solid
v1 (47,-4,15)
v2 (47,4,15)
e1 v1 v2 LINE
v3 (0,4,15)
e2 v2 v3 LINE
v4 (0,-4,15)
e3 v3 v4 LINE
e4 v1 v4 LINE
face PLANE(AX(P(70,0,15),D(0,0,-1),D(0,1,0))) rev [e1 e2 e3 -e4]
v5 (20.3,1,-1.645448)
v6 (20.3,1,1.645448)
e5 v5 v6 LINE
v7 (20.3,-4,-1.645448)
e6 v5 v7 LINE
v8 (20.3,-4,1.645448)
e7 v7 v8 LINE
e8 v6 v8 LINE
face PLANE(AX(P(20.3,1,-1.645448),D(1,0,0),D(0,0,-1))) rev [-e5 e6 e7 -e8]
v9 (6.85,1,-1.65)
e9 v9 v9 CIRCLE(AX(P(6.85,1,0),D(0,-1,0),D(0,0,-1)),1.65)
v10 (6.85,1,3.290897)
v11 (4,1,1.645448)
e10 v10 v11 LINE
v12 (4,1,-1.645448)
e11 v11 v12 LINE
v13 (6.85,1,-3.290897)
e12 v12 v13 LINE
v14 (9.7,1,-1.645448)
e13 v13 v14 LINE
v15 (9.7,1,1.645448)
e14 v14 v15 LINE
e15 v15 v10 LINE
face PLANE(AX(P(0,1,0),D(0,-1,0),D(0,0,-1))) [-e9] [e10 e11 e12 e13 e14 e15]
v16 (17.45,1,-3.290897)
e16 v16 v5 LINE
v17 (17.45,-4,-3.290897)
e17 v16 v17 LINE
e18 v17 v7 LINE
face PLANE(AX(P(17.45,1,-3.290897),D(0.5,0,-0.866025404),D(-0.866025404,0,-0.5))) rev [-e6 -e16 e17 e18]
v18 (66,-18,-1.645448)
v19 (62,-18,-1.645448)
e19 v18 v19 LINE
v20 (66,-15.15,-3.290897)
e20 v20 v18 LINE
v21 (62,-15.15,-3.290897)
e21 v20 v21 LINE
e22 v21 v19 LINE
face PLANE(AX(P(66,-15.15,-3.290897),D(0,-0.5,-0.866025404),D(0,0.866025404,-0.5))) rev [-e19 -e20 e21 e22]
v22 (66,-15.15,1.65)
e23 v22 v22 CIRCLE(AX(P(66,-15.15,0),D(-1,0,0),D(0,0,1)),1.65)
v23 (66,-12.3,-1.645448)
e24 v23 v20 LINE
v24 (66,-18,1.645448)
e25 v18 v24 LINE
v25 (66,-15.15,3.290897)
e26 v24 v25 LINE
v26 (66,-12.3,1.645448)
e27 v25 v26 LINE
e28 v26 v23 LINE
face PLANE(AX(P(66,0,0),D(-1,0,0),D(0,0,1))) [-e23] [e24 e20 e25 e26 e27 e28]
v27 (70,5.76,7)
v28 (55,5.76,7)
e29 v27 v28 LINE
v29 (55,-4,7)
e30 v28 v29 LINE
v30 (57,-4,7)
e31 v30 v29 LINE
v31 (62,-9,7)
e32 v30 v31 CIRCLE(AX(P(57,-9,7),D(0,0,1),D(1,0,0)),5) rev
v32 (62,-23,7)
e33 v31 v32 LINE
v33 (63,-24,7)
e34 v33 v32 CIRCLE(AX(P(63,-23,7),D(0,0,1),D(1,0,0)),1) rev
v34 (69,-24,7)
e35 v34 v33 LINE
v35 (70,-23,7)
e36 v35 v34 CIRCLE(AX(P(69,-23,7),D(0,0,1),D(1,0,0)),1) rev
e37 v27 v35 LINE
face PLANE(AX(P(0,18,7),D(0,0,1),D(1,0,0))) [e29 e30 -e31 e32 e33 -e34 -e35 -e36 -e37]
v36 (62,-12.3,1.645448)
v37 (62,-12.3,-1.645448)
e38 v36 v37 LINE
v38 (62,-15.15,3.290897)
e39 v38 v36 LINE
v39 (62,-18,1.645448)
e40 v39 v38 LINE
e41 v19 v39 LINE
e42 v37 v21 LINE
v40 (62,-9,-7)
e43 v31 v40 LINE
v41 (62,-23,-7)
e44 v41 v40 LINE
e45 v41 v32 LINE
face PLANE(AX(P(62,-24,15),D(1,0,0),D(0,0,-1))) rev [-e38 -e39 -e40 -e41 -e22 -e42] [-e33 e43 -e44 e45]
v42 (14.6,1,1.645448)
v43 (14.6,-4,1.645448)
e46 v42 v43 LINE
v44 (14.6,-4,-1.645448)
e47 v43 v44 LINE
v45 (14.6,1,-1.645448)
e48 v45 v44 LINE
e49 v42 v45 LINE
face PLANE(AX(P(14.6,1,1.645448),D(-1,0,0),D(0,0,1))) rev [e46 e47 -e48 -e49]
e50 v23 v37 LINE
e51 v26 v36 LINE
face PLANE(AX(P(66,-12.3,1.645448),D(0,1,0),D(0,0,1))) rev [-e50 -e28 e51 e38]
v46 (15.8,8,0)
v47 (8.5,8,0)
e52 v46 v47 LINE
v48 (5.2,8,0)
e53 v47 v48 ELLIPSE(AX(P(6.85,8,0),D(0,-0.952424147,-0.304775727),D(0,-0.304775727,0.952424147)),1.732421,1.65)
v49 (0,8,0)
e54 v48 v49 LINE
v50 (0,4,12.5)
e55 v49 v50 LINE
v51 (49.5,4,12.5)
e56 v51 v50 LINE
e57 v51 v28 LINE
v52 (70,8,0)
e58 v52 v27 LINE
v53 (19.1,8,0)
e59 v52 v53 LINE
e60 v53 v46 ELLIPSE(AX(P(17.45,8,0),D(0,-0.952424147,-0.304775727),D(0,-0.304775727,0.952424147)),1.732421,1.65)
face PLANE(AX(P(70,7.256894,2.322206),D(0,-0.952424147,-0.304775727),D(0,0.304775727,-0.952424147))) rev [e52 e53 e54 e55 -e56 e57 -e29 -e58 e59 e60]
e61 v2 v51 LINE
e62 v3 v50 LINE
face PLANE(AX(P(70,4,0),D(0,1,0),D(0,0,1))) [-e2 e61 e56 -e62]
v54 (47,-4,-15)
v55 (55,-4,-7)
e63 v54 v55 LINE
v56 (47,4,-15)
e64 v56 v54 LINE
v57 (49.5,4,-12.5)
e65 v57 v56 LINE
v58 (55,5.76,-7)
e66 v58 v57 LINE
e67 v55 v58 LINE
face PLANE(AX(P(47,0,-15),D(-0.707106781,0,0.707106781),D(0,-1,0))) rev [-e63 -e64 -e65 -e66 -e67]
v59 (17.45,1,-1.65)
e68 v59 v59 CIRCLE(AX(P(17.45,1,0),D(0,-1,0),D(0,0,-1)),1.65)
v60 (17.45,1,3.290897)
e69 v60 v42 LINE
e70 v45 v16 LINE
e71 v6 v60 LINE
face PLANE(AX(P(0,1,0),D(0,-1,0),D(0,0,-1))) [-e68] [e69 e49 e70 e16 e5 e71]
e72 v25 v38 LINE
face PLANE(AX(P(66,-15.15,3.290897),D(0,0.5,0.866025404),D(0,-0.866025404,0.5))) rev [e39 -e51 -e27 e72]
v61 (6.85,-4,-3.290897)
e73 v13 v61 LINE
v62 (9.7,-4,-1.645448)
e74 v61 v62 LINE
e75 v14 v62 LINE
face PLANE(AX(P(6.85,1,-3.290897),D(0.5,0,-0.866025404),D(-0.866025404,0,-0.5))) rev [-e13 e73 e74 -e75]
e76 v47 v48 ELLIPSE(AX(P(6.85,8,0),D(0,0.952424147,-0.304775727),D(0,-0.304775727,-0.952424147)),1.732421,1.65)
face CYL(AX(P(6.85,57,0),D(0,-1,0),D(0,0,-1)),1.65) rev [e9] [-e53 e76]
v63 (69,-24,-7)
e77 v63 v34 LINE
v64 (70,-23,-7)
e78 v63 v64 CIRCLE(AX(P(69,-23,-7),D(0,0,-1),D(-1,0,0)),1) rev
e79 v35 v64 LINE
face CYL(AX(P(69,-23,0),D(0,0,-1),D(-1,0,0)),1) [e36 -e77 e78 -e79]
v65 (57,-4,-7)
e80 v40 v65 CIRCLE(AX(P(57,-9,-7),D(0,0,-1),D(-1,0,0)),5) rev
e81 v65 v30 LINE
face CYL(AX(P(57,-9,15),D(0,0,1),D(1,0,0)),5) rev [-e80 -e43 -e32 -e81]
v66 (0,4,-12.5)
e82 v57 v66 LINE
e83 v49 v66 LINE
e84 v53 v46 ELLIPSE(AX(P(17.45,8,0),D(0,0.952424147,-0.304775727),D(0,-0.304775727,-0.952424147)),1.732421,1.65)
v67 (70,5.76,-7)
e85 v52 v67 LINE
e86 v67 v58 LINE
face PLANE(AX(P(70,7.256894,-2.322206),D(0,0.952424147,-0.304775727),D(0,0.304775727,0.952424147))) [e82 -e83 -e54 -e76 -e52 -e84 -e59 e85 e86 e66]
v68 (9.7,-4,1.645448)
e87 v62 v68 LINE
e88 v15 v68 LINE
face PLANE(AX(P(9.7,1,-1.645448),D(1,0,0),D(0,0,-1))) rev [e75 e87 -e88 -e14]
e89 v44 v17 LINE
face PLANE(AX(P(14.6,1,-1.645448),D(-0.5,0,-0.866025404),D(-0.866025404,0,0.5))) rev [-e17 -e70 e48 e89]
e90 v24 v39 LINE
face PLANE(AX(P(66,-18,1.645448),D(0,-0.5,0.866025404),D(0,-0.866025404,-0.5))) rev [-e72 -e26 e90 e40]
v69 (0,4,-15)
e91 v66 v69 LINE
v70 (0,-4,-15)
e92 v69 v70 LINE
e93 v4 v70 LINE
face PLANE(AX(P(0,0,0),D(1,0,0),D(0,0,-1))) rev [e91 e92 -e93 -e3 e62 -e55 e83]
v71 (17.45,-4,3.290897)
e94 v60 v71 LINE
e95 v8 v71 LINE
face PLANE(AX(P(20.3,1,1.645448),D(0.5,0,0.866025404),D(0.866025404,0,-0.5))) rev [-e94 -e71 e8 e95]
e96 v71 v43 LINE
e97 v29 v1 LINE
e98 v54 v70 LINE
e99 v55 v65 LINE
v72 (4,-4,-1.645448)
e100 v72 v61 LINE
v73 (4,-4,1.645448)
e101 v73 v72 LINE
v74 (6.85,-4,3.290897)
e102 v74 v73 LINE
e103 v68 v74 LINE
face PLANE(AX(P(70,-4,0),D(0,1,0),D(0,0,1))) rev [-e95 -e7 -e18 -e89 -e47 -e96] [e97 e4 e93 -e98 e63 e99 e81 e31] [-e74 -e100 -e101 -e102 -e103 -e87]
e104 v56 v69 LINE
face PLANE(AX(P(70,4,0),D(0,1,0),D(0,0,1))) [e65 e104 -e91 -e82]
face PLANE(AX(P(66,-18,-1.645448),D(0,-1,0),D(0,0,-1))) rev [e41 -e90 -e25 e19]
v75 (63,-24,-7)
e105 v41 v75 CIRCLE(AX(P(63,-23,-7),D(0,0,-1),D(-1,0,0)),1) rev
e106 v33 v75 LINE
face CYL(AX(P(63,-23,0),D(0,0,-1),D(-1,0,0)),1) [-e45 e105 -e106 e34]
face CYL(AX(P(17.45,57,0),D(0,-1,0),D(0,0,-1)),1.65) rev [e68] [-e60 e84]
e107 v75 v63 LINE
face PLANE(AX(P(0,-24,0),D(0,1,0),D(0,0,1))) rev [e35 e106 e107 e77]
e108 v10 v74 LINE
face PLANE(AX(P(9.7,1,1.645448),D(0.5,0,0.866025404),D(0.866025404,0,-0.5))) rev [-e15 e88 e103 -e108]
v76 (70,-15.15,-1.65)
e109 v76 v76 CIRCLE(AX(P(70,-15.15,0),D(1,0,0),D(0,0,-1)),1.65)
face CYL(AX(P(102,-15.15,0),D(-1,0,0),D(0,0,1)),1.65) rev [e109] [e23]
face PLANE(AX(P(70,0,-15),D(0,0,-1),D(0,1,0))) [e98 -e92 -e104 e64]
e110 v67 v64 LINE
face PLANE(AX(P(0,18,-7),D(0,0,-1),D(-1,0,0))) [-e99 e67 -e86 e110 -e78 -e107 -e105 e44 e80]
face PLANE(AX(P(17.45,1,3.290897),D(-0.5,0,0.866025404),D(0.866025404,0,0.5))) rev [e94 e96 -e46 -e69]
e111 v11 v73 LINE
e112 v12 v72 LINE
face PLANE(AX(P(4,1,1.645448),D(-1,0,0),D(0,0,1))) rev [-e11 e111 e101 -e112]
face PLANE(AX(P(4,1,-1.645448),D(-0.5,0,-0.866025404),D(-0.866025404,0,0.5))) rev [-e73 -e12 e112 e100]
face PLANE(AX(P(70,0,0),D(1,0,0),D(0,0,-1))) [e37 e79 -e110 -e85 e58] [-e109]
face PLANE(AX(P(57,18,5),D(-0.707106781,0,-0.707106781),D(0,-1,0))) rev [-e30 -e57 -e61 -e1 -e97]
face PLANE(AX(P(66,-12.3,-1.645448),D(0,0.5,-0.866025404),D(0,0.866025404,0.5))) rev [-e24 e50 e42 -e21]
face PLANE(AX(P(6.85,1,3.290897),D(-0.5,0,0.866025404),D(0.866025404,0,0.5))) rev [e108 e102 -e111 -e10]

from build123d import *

# Parameters (mm, degrees)
BOSS_EXTRUDE1_DEPTH = 70
SKETCH2_R           = 1.65
CUT_EXTRUDE1_DEPTH  = 5
SKETCH3_R           = 1.65
CUT_EXTRUDE2_DEPTH  = 61
SKETCH4_W           = 8
SKETCH4_H           = 30
BOSS_EXTRUDE2_DEPTH = 20
SKETCH5_R           = 1.65
CUT_EXTRUDE3_DEPTH  = 4
SKETCH6_R           = 1.65
CUT_EXTRUDE4_DEPTH  = 40
FILLET1_R           = 1
FILLET2_R           = 5
SKETCH7_W           = 6
SKETCH7_H           = 8
SKETCH7_W_2         = 1
CUT_EXTRUDE5_DEPTH  = 42
CHAMFER1_SIZE       = 10


with BuildPart() as part:
    # Sketch1 → Boss-Extrude1 (new body)
    with BuildSketch(Plane(origin=(0, 0, 0), x_dir=(0, 0, -1), z_dir=(1, 0, 0))):
        Polygon((0, 8), (12.5, 4), (-12.5, 4), align=None)
        Polygon((12.5, 4), (-12.5, 4), (-15, 4), (-15, -4), (15, -4), (15, 4), align=None)
    extrude(amount=BOSS_EXTRUDE1_DEPTH)

    # Sketch2 → Cut-Extrude1 (cut)
    # profile 1 of 2: a face of its own
    with BuildSketch(Plane.XZ.offset(4)):
        Polygon((6.85, 3.290896534), (4, 1.645448267), (4, -1.645448267), (6.85, -3.290896534), (9.7, -1.645448267), (9.7, 1.645448267), align=None)
        with Locations(Location((6.85, 0, 0), (0, 0, 270))):
            Circle(SKETCH2_R, mode=Mode.SUBTRACT)
    # profile 2 of 2: a face of its own
    with BuildSketch(Plane.XZ.offset(4)):
        Polygon((17.45, -3.290896534), (20.3, -1.645448267), (20.3, 1.645448267), (17.45, 3.290896534), (14.6, 1.645448267), (14.6, -1.645448267), align=None)
        with Locations(Location((17.45, 0, 0), (0, 0, 270))):
            Circle(SKETCH2_R, mode=Mode.SUBTRACT)
    extrude(amount=-CUT_EXTRUDE1_DEPTH, mode=Mode.SUBTRACT)

    # Sketch3 → Cut-Extrude2 (cut)
    with BuildSketch(Plane.XZ.offset(4)):
        with Locations(Location((6.85, 0, 0), (0, 0, 270))):
            Circle(SKETCH3_R)
        with Locations(Location((17.45, 0, 0), (0, 0, 270))):
            Circle(SKETCH3_R)
    extrude(amount=-CUT_EXTRUDE2_DEPTH, mode=Mode.SUBTRACT)

    # Sketch4 → Boss-Extrude2 (add)
    with BuildSketch(Plane.XZ.offset(4)):
        with Locations((66, 0)):
            Rectangle(SKETCH4_W, SKETCH4_H)
    extrude(amount=BOSS_EXTRUDE2_DEPTH)

    # Sketch5 → Cut-Extrude3 (cut)
    with BuildSketch(Plane.ZY.offset(-62)):
        Polygon((3.290896534, -15.15), (1.645448267, -12.3), (-1.645448267, -12.3), (-3.290896534, -15.15), (-1.645448267, -18), (1.645448267, -18), align=None)
        with Locations((0, -15.15)):
            Circle(SKETCH5_R, mode=Mode.SUBTRACT)
    extrude(amount=-CUT_EXTRUDE3_DEPTH, mode=Mode.SUBTRACT)

    # Sketch6 → Cut-Extrude4 (cut)
    with BuildSketch(Plane.ZY.offset(-62)):
        with Locations((0, -15.15)):
            Circle(SKETCH6_R)
    extrude(amount=-CUT_EXTRUDE4_DEPTH, mode=Mode.SUBTRACT)

    # Fillet1
    fillet1_edges = [part.edges().sort_by_distance(p)[0] for p in [
        (70, -24, 0),
        (62, -24, 0),
    ]]
    fillet(fillet1_edges, radius=FILLET1_R)

    # Fillet2
    fillet2_edges = [part.edges().sort_by_distance(p)[0] for p in [
        (62, -4, 0),
    ]]
    fillet(fillet2_edges, radius=FILLET2_R)

    # Sketch7 → Cut-Extrude5 (cut)
    with BuildSketch(Plane.XZ.offset(24)):
        with Locations((66, 11)):
            Rectangle(SKETCH7_W, SKETCH7_H)
        with Locations((69.5, 11)):
            Rectangle(SKETCH7_W_2, SKETCH7_H)
        with Locations((60, 11)):
            Rectangle(SKETCH7_W, SKETCH7_H)
        with Locations((60, -11)):
            Rectangle(SKETCH7_W, SKETCH7_H)
        with Locations((66, -11)):
            Rectangle(SKETCH7_W, SKETCH7_H)
        with Locations((69.5, -11)):
            Rectangle(SKETCH7_W_2, SKETCH7_H)
    extrude(amount=-CUT_EXTRUDE5_DEPTH, mode=Mode.SUBTRACT)

    # Chamfer1
    # the kernel refuses this chamfer: 10 mm, written as the material it takes off along each edge
    with BuildSketch(Plane(origin=(57, -29.71682988, 15), x_dir=(0.027495876610587014, 0, -0.9996219169112968), z_dir=(0, 1, 0))) as chamfer1_piece_1_section:
        Polygon((CHAMFER1_SIZE * 0.999621916911, CHAMFER1_SIZE * 0.0274958766106), (-CHAMFER1_SIZE * 0.0274958766106, CHAMFER1_SIZE * 0.999621916911), (0, 0), align=None)
    chamfer1_piece_1 = extrude(amount=59.433659759, mode=Mode.PRIVATE)
    chamfer1_piece_1 = split(chamfer1_piece_1, bisect_by=Plane(origin=(53.542815877, 0, 7), z_dir=(0, 0, 1)), keep=Keep.TOP, mode=Mode.PRIVATE)
    add(chamfer1_piece_1, mode=Mode.SUBTRACT)
    with BuildSketch(Plane(origin=(57, -29.71682988, -15), x_dir=(-0.9996219169112968, 0, -0.027495876610586317), z_dir=(0, 1, 0))) as chamfer1_piece_2_section:
        Polygon((CHAMFER1_SIZE * 0.999621916911, CHAMFER1_SIZE * 0.0274958766106), (-CHAMFER1_SIZE * 0.0274958766106, CHAMFER1_SIZE * 0.999621916911), (0, 0), align=None)
    chamfer1_piece_2 = extrude(amount=59.433659759, mode=Mode.PRIVATE)
    chamfer1_piece_2 = split(chamfer1_piece_2, bisect_by=Plane(origin=(53.542815877, 0, -7), z_dir=(0, 0, -1)), keep=Keep.TOP, mode=Mode.PRIVATE)
    add(chamfer1_piece_2, mode=Mode.SUBTRACT)


solid = part.part
